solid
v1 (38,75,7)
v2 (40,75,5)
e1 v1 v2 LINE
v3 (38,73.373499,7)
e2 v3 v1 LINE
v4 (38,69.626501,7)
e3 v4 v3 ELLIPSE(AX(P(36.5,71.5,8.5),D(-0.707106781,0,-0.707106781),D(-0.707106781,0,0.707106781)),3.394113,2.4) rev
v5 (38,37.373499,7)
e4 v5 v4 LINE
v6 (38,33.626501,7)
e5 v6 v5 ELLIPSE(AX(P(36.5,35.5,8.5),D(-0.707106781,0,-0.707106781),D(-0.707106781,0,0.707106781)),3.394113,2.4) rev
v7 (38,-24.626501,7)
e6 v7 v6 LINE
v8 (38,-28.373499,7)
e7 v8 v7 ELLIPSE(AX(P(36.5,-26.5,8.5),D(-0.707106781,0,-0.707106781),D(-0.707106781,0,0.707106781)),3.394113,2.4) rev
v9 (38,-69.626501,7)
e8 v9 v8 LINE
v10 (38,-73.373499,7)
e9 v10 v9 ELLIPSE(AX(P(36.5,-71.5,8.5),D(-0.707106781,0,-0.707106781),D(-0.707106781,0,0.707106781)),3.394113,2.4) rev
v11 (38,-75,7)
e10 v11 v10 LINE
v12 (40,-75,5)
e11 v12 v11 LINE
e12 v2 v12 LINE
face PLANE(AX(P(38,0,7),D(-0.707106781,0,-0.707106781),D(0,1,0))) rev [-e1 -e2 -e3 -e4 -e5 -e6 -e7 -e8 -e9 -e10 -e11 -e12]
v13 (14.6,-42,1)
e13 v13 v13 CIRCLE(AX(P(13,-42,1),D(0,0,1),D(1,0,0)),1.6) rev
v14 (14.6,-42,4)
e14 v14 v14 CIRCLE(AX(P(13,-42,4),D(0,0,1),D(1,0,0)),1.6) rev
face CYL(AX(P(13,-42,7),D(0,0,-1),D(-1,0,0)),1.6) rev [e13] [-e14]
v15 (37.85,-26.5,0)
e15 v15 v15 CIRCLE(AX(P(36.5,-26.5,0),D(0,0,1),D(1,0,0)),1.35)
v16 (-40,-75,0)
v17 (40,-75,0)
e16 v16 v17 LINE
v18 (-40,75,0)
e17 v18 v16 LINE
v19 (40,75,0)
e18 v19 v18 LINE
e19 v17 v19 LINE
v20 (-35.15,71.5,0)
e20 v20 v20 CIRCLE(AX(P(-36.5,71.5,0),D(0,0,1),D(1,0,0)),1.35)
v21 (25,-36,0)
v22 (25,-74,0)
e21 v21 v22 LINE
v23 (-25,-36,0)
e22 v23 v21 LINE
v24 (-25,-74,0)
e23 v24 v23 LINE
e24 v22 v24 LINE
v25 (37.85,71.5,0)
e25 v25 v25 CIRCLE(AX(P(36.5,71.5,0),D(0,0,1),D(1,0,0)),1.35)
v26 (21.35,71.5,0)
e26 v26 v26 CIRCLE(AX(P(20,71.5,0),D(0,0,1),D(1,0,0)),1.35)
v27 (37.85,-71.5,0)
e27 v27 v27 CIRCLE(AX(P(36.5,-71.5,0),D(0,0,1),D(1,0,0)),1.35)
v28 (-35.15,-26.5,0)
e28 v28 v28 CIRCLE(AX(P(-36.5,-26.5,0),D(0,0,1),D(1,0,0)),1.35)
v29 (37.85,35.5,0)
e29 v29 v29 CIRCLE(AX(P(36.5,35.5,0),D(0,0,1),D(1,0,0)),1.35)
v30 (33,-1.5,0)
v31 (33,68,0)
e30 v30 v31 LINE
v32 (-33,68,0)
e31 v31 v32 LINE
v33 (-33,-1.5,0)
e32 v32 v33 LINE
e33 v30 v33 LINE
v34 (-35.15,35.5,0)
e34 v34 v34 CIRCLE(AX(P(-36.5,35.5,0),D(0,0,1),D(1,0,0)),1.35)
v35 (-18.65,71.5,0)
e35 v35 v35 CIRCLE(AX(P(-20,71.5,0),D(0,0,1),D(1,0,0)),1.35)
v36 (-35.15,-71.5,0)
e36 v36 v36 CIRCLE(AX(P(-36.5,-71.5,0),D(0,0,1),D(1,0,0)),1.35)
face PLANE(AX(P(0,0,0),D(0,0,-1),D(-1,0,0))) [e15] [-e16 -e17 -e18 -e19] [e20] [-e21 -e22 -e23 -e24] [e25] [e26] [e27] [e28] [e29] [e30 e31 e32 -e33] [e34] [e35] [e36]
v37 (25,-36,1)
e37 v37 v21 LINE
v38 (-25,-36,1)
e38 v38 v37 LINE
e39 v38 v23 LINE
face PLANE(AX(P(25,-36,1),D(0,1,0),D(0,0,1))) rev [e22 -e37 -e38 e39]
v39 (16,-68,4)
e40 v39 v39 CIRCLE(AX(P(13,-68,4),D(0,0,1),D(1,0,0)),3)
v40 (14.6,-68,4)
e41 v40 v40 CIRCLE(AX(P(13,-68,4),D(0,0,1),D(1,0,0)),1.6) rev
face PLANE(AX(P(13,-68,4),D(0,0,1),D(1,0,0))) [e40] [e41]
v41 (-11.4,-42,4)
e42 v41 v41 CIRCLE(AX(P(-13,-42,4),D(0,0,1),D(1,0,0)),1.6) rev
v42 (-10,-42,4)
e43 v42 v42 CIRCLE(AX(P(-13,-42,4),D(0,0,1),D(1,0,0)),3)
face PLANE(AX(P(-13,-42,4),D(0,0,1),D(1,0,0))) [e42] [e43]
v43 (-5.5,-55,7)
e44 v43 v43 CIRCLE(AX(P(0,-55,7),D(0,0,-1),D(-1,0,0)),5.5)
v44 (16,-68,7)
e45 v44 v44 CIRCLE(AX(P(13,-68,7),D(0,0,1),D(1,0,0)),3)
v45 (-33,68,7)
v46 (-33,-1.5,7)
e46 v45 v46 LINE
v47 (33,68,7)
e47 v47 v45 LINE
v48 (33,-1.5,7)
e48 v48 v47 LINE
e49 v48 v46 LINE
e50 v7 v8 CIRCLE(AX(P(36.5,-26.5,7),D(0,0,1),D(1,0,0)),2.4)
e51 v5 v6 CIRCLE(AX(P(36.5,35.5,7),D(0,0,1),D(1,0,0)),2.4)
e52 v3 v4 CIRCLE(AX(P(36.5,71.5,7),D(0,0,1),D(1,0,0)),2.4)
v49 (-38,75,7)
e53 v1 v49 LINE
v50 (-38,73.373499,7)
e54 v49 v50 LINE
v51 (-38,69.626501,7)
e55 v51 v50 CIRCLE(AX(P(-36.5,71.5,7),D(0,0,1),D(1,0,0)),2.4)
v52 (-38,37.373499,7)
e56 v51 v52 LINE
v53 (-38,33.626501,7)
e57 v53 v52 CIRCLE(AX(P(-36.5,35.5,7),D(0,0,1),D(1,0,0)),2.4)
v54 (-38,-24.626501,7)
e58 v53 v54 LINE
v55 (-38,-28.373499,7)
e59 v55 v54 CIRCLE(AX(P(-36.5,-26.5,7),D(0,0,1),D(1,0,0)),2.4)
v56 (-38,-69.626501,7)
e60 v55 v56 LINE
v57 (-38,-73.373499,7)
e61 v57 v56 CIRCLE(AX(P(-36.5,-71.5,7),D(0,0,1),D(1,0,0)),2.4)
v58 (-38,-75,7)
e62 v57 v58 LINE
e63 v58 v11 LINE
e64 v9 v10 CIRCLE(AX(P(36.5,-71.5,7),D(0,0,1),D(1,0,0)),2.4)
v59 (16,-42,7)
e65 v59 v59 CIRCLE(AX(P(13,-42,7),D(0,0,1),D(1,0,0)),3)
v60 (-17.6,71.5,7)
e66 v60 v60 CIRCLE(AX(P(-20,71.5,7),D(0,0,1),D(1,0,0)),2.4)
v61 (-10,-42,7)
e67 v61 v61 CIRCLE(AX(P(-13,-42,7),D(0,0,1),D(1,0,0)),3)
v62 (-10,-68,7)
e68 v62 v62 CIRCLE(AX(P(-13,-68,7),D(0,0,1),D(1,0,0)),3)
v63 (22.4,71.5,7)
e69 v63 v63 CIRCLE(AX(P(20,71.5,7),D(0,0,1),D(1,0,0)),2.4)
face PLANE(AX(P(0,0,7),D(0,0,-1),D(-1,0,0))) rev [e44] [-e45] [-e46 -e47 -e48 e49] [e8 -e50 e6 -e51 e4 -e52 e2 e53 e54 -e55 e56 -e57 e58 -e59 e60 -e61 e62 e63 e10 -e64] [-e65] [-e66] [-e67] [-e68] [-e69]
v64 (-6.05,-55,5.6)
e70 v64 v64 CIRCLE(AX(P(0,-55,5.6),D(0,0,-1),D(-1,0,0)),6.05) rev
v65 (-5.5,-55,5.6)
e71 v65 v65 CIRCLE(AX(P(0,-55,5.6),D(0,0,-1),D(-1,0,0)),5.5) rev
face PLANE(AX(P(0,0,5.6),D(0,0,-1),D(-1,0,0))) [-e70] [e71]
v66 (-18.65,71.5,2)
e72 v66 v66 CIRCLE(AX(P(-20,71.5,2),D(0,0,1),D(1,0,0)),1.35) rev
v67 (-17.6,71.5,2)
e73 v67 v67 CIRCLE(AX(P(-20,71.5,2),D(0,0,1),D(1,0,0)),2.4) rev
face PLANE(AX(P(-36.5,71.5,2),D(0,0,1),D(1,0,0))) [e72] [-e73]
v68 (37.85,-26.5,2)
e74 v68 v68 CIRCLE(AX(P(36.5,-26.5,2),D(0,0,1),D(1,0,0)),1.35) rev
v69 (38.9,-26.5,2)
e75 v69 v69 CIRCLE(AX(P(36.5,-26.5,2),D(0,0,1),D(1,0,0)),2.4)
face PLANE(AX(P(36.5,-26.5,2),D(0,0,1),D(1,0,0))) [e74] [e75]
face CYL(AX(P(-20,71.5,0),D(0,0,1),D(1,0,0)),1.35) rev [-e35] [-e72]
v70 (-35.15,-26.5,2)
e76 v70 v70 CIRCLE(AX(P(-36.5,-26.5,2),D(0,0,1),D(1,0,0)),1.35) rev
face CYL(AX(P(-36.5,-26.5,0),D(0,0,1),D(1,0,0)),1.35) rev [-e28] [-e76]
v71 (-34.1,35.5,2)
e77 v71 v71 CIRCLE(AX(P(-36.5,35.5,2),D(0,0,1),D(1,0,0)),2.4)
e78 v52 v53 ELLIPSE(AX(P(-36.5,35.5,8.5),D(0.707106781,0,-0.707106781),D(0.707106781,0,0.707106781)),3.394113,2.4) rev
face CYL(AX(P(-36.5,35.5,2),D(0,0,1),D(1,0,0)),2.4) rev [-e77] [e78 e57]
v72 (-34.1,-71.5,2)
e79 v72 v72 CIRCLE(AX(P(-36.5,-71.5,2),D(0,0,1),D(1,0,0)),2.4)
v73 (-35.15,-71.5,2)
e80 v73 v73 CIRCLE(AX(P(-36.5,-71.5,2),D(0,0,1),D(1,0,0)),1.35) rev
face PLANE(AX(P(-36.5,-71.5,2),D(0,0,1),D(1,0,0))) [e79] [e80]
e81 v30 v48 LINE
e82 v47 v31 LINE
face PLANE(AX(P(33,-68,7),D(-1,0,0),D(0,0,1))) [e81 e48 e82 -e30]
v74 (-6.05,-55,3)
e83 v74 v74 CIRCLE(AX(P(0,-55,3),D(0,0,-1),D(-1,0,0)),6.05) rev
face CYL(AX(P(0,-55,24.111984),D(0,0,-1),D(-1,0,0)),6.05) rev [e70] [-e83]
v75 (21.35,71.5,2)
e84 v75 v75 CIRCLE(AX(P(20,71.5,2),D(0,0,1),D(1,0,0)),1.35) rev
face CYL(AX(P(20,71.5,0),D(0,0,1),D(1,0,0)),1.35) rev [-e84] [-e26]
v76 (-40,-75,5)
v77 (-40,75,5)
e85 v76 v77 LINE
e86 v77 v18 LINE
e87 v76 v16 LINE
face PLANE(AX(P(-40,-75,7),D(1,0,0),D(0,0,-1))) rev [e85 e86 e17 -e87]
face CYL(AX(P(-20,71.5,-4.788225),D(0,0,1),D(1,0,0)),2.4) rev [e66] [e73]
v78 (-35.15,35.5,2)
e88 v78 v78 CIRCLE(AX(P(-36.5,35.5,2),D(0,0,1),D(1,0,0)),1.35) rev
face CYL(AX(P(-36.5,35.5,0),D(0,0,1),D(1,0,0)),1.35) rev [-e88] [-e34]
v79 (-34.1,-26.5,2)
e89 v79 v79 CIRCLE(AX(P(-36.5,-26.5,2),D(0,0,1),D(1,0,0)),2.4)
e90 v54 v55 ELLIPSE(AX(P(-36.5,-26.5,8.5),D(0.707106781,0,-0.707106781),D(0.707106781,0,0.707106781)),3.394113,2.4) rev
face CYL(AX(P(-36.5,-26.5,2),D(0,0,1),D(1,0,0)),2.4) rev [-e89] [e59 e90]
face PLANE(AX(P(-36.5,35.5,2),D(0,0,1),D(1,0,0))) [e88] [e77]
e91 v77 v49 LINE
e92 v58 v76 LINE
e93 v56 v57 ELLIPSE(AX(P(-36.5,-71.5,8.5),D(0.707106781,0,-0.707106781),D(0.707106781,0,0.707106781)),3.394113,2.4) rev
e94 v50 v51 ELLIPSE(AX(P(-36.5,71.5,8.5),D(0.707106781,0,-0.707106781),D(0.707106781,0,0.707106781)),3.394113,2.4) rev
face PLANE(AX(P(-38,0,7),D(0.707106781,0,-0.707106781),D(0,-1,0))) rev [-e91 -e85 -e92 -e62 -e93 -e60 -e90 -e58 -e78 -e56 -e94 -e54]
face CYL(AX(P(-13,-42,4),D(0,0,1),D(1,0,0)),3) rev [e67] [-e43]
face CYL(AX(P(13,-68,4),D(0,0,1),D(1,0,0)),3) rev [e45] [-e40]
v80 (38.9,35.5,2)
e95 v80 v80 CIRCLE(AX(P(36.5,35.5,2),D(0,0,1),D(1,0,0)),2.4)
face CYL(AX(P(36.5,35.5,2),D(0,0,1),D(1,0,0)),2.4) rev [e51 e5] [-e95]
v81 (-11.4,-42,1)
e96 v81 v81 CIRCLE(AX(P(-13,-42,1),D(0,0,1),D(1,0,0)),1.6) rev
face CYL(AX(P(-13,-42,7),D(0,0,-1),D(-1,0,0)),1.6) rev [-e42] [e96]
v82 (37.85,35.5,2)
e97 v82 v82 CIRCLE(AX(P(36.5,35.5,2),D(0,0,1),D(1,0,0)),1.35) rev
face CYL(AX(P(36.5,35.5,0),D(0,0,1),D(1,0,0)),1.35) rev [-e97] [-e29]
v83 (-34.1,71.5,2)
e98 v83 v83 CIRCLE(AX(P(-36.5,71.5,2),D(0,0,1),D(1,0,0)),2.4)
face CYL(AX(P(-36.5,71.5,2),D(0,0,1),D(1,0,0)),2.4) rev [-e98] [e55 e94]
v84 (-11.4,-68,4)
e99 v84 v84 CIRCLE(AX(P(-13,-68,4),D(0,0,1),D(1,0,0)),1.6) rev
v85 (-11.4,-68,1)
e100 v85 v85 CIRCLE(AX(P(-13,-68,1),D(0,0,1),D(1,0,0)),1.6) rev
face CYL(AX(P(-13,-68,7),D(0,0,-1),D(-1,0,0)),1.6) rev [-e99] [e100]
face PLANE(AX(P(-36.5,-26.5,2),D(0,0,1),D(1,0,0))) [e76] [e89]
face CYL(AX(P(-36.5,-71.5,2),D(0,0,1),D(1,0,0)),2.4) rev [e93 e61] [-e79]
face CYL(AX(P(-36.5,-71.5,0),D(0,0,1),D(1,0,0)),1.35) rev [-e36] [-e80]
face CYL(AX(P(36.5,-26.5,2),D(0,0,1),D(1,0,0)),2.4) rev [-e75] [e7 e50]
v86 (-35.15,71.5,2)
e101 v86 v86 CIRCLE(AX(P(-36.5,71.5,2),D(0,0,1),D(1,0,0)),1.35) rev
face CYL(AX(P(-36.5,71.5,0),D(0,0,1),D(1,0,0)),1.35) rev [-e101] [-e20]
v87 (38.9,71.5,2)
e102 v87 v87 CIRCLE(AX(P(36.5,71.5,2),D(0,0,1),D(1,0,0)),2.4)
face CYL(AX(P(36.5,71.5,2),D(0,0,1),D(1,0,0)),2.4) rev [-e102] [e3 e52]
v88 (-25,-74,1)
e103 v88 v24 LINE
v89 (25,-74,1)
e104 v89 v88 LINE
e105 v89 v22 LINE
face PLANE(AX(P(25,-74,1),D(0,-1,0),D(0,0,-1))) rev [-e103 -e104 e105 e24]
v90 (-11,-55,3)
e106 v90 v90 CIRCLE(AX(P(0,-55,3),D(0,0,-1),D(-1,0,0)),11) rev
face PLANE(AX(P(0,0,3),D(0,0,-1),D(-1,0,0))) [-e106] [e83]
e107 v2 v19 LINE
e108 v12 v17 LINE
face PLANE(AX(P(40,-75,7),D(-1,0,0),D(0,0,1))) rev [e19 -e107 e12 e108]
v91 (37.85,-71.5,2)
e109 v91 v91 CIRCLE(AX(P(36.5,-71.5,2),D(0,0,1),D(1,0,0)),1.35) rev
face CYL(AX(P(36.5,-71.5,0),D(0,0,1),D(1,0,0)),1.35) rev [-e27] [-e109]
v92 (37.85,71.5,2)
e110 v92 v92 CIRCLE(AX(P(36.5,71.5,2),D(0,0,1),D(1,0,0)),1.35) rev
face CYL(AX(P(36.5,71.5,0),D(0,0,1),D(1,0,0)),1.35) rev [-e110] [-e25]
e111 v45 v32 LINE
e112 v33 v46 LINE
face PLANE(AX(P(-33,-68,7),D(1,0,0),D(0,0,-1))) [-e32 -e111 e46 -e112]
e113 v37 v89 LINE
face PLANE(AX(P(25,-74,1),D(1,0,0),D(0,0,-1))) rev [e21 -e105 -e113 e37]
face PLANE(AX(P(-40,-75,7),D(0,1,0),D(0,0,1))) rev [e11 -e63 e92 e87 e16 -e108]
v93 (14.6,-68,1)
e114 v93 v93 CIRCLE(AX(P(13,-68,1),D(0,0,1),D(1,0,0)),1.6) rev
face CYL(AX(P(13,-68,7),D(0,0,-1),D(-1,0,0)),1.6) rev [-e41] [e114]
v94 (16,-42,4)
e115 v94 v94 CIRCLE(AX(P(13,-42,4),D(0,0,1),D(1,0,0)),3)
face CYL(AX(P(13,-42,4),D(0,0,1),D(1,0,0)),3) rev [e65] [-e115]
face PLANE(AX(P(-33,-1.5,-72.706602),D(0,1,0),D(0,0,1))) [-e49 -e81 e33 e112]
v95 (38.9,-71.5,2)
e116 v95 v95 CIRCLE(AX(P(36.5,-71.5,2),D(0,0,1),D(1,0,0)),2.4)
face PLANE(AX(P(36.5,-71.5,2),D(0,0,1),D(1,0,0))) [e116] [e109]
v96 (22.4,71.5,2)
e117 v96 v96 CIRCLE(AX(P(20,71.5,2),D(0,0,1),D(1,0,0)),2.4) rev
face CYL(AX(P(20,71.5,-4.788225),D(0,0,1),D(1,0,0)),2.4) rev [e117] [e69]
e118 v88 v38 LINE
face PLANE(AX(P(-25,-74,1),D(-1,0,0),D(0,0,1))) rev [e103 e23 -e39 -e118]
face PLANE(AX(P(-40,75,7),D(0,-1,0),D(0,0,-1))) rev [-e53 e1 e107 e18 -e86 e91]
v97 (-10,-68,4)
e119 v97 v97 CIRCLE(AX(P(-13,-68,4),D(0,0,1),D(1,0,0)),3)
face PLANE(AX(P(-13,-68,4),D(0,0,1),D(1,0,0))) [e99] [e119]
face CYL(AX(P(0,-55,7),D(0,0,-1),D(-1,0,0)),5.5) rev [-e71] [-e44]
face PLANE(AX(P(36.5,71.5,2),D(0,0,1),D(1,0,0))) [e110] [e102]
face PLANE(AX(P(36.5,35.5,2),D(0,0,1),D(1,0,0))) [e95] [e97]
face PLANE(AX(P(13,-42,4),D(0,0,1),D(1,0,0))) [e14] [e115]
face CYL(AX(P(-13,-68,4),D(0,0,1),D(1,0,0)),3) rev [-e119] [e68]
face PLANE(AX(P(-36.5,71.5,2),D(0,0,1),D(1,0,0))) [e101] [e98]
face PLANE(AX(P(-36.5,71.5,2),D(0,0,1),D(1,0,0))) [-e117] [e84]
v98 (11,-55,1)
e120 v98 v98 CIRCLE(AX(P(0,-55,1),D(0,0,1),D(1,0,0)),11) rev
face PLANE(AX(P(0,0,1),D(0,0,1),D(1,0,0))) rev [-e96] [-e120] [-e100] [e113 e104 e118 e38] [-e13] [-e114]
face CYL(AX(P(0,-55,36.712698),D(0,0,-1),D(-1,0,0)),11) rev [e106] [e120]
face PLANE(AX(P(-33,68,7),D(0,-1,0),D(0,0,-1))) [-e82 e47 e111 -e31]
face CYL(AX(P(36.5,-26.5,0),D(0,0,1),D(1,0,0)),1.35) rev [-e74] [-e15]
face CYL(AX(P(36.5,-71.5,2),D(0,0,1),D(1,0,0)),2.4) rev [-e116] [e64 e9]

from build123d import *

# Parameters (mm, degrees)
SKETCH1_W           = 80
SKETCH1_H           = 150
SKETCH1_W_2         = 66
SKETCH1_H_2         = 136
BOSS_EXTRUDE1_DEPTH = 7
SKETCH2_W           = 66
SKETCH2_H           = 36
BOSS_EXTRUDE2_DEPTH = 7
SKETCH3_R           = 5.5
CUT_EXTRUDE1_DEPTH  = 86.287748241
SKETCH4_R           = 6.05
CUT_EXTRUDE2_DEPTH  = 5.6
SKETCH5_R           = 11
CUT_EXTRUDE3_DEPTH  = 3
SKETCH6_R           = 1.6
CUT_EXTRUDE4_DEPTH  = 86.287748241
SKETCH7_W           = 50
SKETCH7_H           = 38
CUT_EXTRUDE5_DEPTH  = 1
SKETCH8_R           = 3
CUT_EXTRUDE6_DEPTH  = 3
SKETCH9_R           = 1.35
CUT_EXTRUDE7_DEPTH  = 86.287748241
SKETCH10_R          = 2.4
CUT_EXTRUDE8_DEPTH  = 5
CHAMFER1_SIZE       = 2
SKETCH11_W          = 66
SKETCH11_H          = 30.5
BOSS_EXTRUDE3_DEPTH = 7
SKETCH12_R          = 1.35
CUT_EXTRUDE9_DEPTH  = 86.287748241
SKETCH13_R          = 2.4
CUT_EXTRUDE10_DEPTH = 5


with BuildPart() as part:
    # Sketch1 → Boss-Extrude1 (new body)
    with BuildSketch(Plane.XY):
        Rectangle(SKETCH1_W, SKETCH1_H)
        Rectangle(SKETCH1_W_2, SKETCH1_H_2, mode=Mode.SUBTRACT)
    extrude(amount=BOSS_EXTRUDE1_DEPTH)

    # Sketch2 → Boss-Extrude2 (add)
    with BuildSketch(Plane.XY.offset(7)):
        with Locations((0, -50)):
            Rectangle(SKETCH2_W, SKETCH2_H)
    extrude(amount=-BOSS_EXTRUDE2_DEPTH)

    # Sketch3 → Cut-Extrude1 (cut, through all)
    with BuildSketch(Plane(origin=(0, 0, 0), x_dir=(-1, 0, 0), z_dir=(0, 0, -1))):
        with Locations((0, -55)):
            Circle(SKETCH3_R)
    extrude(amount=-CUT_EXTRUDE1_DEPTH, mode=Mode.SUBTRACT)

    # Sketch4 → Cut-Extrude2 (cut)
    with BuildSketch(Plane(origin=(0, 0, 0), x_dir=(-1, 0, 0), z_dir=(0, 0, -1))):
        with Locations((0, -55)):
            Circle(SKETCH4_R)
    extrude(amount=-CUT_EXTRUDE2_DEPTH, mode=Mode.SUBTRACT)

    # Sketch5 → Cut-Extrude3 (cut)
    with BuildSketch(Plane(origin=(0, 0, 0), x_dir=(-1, 0, 0), z_dir=(0, 0, -1))):
        with Locations((0, -55)):
            Circle(SKETCH5_R)
    extrude(amount=-CUT_EXTRUDE3_DEPTH, mode=Mode.SUBTRACT)

    # Sketch6 → Cut-Extrude4 (cut, through all)
    with BuildSketch(Plane(origin=(0, 0, 0), x_dir=(-1, 0, 0), z_dir=(0, 0, -1))):
        with Locations((-13, -42)):
            Circle(SKETCH6_R)
        with Locations((13, -42)):
            Circle(SKETCH6_R)
        with Locations((13, -68)):
            Circle(SKETCH6_R)
        with Locations((-13, -68)):
            Circle(SKETCH6_R)
    extrude(amount=-CUT_EXTRUDE4_DEPTH, mode=Mode.SUBTRACT)

    # Sketch7 → Cut-Extrude5 (cut)
    with BuildSketch(Plane(origin=(0, 0, 0), x_dir=(-1, 0, 0), z_dir=(0, 0, -1))):
        with Locations((0, -55)):
            Rectangle(SKETCH7_W, SKETCH7_H)
    extrude(amount=-CUT_EXTRUDE5_DEPTH, mode=Mode.SUBTRACT)

    # Sketch8 → Cut-Extrude6 (cut)
    with BuildSketch(Plane.XY.offset(7)):
        with Locations((-13, -42)):
            Circle(SKETCH8_R)
        with Locations((13, -42)):
            Circle(SKETCH8_R)
        with Locations((13, -68)):
            Circle(SKETCH8_R)
        with Locations((-13, -68)):
            Circle(SKETCH8_R)
    extrude(amount=-CUT_EXTRUDE6_DEPTH, mode=Mode.SUBTRACT)

    # Sketch9 → Cut-Extrude7 (cut, through all)
    with BuildSketch(Plane.XY.offset(7)):
        with Locations((-36.5, 71.5)):
            Circle(SKETCH9_R)
        with Locations((36.5, 71.5)):
            Circle(SKETCH9_R)
        with Locations((-36.5, -71.5)):
            Circle(SKETCH9_R)
        with Locations((36.5, -71.5)):
            Circle(SKETCH9_R)
        with Locations((-36.5, 35.5)):
            Circle(SKETCH9_R)
        with Locations((36.5, 35.5)):
            Circle(SKETCH9_R)
        with Locations((36.5, -26.5)):
            Circle(SKETCH9_R)
        with Locations((-36.5, -26.5)):
            Circle(SKETCH9_R)
    extrude(amount=-CUT_EXTRUDE7_DEPTH, mode=Mode.SUBTRACT)

    # Sketch10 → Cut-Extrude8 (cut)
    with BuildSketch(Plane.XY.offset(7)):
        with Locations((-36.5, 71.5)):
            Circle(SKETCH10_R)
        with Locations((36.5, 35.5)):
            Circle(SKETCH10_R)
        with Locations((-36.5, 35.5)):
            Circle(SKETCH10_R)
        with Locations((36.5, 71.5)):
            Circle(SKETCH10_R)
        with Locations((-36.5, -71.5)):
            Circle(SKETCH10_R)
        with Locations((36.5, -71.5)):
            Circle(SKETCH10_R)
        with Locations((-36.5, -26.5)):
            Circle(SKETCH10_R)
        with Locations((36.5, -26.5)):
            Circle(SKETCH10_R)
    extrude(amount=-CUT_EXTRUDE8_DEPTH, mode=Mode.SUBTRACT)

    # Chamfer1
    # the kernel refuses this chamfer: 2 mm, written as the material it takes off along each edge
    with BuildSketch(Plane(origin=(-40, 80.143365976, 7), x_dir=(-0.027495876610585623, 0, -0.9996219169112968), z_dir=(0, -1, 0)), Plane(origin=(40, -80.143365976, 7), x_dir=(0.027495876610585623, 0, -0.9996219169112968), z_dir=(0, 1, 0))) as chamfer1_piece_1:
        Polygon((CHAMFER1_SIZE * 0.999621916911, CHAMFER1_SIZE * 0.0274958766106), (-CHAMFER1_SIZE * 0.0274958766106, CHAMFER1_SIZE * 0.999621916911), (0, 0), align=None)
    extrude(amount=160.286731952, mode=Mode.SUBTRACT)

    # Sketch11 → Boss-Extrude3 (add)
    with BuildSketch(Plane.XY.offset(7)):
        with Locations((0, -16.75)):
            Rectangle(SKETCH11_W, SKETCH11_H)
    extrude(amount=-BOSS_EXTRUDE3_DEPTH)

    # Sketch12 → Cut-Extrude9 (cut, through all)
    with BuildSketch(Plane.XY.offset(7)):
        with Locations((-20, 71.5)):
            Circle(SKETCH12_R)
        with Locations((20, 71.5)):
            Circle(SKETCH12_R)
    extrude(amount=-CUT_EXTRUDE9_DEPTH, mode=Mode.SUBTRACT)

    # Sketch13 → Cut-Extrude10 (cut)
    with BuildSketch(Plane.XY.offset(7)):
        with Locations((-20, 71.5)):
            Circle(SKETCH13_R)
        with Locations((20, 71.5)):
            Circle(SKETCH13_R)
    extrude(amount=-CUT_EXTRUDE10_DEPTH, mode=Mode.SUBTRACT)


solid = part.part
